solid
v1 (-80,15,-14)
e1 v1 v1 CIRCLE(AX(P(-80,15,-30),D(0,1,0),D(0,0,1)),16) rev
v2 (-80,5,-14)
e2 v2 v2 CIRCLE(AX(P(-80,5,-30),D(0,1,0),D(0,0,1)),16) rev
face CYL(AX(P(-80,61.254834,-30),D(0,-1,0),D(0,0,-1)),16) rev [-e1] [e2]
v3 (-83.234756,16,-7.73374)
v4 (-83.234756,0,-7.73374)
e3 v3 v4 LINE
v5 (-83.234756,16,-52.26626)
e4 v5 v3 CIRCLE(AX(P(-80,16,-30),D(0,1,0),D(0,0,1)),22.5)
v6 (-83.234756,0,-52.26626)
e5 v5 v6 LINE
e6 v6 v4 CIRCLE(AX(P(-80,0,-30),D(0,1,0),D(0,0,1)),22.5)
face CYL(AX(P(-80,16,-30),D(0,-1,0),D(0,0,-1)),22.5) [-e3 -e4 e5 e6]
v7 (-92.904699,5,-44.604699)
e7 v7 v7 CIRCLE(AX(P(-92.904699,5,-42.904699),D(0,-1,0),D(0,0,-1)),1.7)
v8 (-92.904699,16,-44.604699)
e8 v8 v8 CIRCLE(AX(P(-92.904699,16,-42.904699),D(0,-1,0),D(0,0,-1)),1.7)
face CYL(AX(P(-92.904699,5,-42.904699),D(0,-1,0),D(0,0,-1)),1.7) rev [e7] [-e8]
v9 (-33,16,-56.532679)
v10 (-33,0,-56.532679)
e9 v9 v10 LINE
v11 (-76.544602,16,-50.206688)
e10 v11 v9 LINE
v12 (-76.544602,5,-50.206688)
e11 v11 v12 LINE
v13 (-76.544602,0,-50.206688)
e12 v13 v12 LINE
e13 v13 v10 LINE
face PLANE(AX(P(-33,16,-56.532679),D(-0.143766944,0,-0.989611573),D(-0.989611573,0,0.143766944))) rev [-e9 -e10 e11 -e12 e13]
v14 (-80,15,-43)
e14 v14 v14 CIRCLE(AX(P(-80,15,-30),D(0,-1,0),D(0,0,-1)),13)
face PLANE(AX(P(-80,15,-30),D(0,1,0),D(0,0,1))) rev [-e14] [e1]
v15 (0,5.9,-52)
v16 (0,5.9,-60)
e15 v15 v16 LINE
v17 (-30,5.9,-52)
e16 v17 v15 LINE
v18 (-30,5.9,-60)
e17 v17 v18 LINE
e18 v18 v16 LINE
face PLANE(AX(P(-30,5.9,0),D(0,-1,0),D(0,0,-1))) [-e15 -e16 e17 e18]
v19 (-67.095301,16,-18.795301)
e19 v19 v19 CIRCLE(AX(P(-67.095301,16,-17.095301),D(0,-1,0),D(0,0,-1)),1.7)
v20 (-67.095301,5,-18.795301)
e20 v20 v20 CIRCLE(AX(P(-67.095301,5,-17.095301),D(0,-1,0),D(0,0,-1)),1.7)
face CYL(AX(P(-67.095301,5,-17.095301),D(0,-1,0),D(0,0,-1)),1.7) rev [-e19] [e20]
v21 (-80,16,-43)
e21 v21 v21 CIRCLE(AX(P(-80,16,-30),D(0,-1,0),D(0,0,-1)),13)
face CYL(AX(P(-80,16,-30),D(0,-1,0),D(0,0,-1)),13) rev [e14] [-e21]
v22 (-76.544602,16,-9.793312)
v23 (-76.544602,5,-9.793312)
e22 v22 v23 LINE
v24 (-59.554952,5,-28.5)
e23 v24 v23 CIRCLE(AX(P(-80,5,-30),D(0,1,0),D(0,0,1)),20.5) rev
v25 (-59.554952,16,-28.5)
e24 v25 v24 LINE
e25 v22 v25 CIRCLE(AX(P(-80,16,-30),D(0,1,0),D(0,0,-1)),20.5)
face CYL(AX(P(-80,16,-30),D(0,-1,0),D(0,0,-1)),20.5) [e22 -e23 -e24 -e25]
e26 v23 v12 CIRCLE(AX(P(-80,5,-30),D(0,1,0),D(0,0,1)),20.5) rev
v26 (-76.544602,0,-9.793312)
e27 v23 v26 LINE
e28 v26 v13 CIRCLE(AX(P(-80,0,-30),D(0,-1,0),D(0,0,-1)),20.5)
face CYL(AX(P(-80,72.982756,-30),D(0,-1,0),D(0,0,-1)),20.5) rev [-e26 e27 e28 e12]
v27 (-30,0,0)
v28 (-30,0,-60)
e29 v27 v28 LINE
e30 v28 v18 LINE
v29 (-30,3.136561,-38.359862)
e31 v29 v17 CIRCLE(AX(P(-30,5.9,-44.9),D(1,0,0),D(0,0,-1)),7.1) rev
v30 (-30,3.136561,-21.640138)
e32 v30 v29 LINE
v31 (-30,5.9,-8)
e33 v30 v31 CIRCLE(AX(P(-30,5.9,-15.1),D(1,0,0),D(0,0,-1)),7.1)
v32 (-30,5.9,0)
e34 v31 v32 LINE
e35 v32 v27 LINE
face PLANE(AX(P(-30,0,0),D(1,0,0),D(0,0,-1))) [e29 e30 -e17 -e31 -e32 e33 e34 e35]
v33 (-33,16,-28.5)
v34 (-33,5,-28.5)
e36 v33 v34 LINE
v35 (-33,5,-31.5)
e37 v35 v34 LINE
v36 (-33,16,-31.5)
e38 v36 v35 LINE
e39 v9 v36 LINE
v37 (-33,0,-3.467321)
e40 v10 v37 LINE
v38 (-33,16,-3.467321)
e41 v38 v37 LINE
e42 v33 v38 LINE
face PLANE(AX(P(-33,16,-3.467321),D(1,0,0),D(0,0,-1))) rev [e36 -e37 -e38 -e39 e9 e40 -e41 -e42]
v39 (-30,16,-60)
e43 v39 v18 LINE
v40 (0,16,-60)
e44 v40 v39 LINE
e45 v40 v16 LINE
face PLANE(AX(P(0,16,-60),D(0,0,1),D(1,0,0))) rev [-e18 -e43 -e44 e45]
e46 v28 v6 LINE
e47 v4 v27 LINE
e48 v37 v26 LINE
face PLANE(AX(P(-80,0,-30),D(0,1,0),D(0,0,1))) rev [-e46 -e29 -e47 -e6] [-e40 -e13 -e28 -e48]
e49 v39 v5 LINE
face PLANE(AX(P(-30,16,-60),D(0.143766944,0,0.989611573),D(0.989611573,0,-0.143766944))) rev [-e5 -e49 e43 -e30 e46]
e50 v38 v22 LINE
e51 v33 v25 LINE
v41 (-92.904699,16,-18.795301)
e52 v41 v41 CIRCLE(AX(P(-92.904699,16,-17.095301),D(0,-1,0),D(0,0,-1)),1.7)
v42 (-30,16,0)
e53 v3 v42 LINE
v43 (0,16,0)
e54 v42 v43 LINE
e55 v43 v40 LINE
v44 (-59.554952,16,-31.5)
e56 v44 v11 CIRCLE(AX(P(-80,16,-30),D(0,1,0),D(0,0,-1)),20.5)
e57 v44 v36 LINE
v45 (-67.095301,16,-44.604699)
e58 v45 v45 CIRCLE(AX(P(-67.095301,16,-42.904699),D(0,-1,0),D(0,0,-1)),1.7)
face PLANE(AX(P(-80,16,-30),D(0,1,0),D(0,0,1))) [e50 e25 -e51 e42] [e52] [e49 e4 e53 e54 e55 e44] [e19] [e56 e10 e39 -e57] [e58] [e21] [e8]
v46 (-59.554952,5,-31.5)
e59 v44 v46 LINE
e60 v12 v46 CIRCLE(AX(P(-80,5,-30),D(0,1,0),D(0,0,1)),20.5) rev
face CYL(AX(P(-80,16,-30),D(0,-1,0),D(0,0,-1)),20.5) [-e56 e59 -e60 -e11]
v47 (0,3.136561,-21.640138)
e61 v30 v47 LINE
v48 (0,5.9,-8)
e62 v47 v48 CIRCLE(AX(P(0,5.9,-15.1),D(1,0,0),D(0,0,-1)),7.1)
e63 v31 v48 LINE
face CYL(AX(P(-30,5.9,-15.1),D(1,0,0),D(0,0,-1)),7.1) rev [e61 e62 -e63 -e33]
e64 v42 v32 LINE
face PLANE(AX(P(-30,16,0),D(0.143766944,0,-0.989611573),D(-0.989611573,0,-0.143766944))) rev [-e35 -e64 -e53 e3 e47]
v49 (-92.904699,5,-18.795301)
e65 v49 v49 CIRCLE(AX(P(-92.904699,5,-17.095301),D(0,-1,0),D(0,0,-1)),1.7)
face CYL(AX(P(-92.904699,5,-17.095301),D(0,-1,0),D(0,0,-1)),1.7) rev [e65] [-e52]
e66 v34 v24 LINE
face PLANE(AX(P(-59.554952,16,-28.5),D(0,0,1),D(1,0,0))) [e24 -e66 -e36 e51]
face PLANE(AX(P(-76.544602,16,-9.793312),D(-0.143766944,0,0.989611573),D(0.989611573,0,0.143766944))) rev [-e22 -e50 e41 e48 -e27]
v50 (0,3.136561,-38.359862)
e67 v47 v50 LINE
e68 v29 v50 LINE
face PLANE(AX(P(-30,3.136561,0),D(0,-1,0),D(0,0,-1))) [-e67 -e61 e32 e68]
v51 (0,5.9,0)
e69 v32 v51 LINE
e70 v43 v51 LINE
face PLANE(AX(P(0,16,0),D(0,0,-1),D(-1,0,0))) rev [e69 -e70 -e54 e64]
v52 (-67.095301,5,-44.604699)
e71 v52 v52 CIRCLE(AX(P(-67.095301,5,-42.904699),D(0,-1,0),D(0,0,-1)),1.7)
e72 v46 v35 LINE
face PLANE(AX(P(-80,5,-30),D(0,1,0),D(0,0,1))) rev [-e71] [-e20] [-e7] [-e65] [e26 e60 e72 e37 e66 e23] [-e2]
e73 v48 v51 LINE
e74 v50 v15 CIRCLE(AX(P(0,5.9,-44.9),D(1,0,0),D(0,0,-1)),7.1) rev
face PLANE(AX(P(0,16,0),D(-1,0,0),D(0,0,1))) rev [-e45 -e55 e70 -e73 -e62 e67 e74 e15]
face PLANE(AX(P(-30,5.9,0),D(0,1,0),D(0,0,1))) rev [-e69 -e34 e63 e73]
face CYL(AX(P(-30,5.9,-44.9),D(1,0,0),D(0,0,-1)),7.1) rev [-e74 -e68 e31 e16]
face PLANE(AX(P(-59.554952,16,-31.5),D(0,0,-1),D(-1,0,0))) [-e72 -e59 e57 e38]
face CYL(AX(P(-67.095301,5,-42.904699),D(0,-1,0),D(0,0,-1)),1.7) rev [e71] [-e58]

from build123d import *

# Parameters (mm, degrees)
EXTRUDE_1_DEPTH      = 16
SKETCH_2_R           = 16
CUT_EXTRUDE_1_DEPTH  = 15
SKETCH_3_R           = 13
CUT_EXTRUDE_2_DEPTH  = 120.713198938
SKETCH_4_R           = 20.5
CUT_EXTRUDE_3_DEPTH  = 5
HOLE_WIZARD_M32_D    = 3.4
CUT_EXTRUDE_8_DEPTH  = 30
CUT_EXTRUDE_11_DEPTH = 120.842605112
EXTRUDE_2_DEPTH      = 11


with BuildPart() as part:
    # Эскиз1 → Бобышка-Вытянуть1 (new body)
    with BuildSketch(Plane(origin=(0, 0, 0), x_dir=(1, 0, 0), z_dir=(0, 1, 0))):
        with BuildLine():
            Line((0, 0), (0, 60))
            Line((0, 60), (-30, 60))
            Line((-30, 60), (-83.234756238, 52.266260397))
            ThreePointArc((-83.234756238, 52.266260397), (-102.5, 30), (-83.234756238, 7.733739603))
            Line((-83.234756238, 7.733739603), (-30, 0))
            Line((-30, 0), (0, 0))
        make_face()
    extrude(amount=EXTRUDE_1_DEPTH)

    # Эскиз2 → Вырез-Вытянуть1 (cut)
    with BuildSketch(Plane.XZ):
        with Locations(Location((-80, -30, 0), (0, 0, 270))):
            Circle(SKETCH_2_R)
    extrude(amount=-CUT_EXTRUDE_1_DEPTH, mode=Mode.SUBTRACT)

    # Эскиз3 → Вырез-Вытянуть2 (cut, through all)
    with BuildSketch(Plane.XZ.offset(-15)):
        with Locations(Location((-80, -30, 0), (0, 0, 270))):
            Circle(SKETCH_3_R)
    extrude(amount=-CUT_EXTRUDE_2_DEPTH, mode=Mode.SUBTRACT)

    # Эскиз4 → Вырез-Вытянуть3 (cut)
    with BuildSketch(Plane.XZ):
        with Locations(Location((-80, -30, 0), (0, 0, 270))):
            Circle(SKETCH_4_R)
    extrude(amount=-CUT_EXTRUDE_3_DEPTH, mode=Mode.SUBTRACT)

    # Отверстие с зазором M32 (through all)
    with Locations(Plane(origin=(0, 5, 0), x_dir=(-1, 0, 0), z_dir=(0, -1, 0))):
        with Locations((92.904698757, 17.095301243), (67.095301243, 17.095301243), (67.095301243, 42.904698757), (92.904698757, 42.904698757)):
            Hole(HOLE_WIZARD_M32_D / 2)

    # Эскиз8 → Вырез-Вытянуть8 (cut)
    with BuildSketch(Plane(origin=(0, 0, 0), x_dir=(0, 0, -1), z_dir=(1, 0, 0))):
        with BuildLine():
            Line((38.359861864, 3.136561351), (21.640138136, 3.136561351))
            ThreePointArc((21.640138136, 3.136561351), (16.509790629, 12.858627047), (8, 5.9))
            Line((8, 5.9), (0, 5.9))
            Line((0, 5.9), (0, 0))
            Line((0, 0), (60, 0))
            Line((60, 0), (60, 5.9))
            Line((60, 5.9), (52, 5.9))
            ThreePointArc((52, 5.9), (43.490209371, 12.858627047), (38.359861864, 3.136561351))
        make_face()
    extrude(amount=-CUT_EXTRUDE_8_DEPTH, mode=Mode.SUBTRACT)

    # Эскиз14 → Вырез-Вытянуть11 (cut, through all)
    with BuildSketch(Plane.XZ):
        with BuildLine():
            Line((-33, -56.53267916), (-76.544602266, -50.206687668))
            ThreePointArc((-76.544602266, -50.206687668), (-59.5, -30), (-76.544602266, -9.793312332))
            Line((-76.544602266, -9.793312332), (-33, -3.46732084))
            Line((-33, -3.46732084), (-33, -56.53267916))
        make_face()
    extrude(amount=-CUT_EXTRUDE_11_DEPTH, mode=Mode.SUBTRACT)

    # Эскиз15 → Бобышка-Вытянуть2 (add, through all)
    with BuildSketch(Plane.XZ.offset(-5)):
        with BuildLine():
            Line((-59.5549517, -31.5), (-33, -31.5))
            Line((-33, -31.5), (-33, -28.5))
            Line((-33, -28.5), (-59.5549517, -28.5))
            ThreePointArc((-59.5549517, -28.5), (-59.5, -30), (-59.5549517, -31.5))
        make_face()
    extrude(amount=-EXTRUDE_2_DEPTH)


solid = part.part
